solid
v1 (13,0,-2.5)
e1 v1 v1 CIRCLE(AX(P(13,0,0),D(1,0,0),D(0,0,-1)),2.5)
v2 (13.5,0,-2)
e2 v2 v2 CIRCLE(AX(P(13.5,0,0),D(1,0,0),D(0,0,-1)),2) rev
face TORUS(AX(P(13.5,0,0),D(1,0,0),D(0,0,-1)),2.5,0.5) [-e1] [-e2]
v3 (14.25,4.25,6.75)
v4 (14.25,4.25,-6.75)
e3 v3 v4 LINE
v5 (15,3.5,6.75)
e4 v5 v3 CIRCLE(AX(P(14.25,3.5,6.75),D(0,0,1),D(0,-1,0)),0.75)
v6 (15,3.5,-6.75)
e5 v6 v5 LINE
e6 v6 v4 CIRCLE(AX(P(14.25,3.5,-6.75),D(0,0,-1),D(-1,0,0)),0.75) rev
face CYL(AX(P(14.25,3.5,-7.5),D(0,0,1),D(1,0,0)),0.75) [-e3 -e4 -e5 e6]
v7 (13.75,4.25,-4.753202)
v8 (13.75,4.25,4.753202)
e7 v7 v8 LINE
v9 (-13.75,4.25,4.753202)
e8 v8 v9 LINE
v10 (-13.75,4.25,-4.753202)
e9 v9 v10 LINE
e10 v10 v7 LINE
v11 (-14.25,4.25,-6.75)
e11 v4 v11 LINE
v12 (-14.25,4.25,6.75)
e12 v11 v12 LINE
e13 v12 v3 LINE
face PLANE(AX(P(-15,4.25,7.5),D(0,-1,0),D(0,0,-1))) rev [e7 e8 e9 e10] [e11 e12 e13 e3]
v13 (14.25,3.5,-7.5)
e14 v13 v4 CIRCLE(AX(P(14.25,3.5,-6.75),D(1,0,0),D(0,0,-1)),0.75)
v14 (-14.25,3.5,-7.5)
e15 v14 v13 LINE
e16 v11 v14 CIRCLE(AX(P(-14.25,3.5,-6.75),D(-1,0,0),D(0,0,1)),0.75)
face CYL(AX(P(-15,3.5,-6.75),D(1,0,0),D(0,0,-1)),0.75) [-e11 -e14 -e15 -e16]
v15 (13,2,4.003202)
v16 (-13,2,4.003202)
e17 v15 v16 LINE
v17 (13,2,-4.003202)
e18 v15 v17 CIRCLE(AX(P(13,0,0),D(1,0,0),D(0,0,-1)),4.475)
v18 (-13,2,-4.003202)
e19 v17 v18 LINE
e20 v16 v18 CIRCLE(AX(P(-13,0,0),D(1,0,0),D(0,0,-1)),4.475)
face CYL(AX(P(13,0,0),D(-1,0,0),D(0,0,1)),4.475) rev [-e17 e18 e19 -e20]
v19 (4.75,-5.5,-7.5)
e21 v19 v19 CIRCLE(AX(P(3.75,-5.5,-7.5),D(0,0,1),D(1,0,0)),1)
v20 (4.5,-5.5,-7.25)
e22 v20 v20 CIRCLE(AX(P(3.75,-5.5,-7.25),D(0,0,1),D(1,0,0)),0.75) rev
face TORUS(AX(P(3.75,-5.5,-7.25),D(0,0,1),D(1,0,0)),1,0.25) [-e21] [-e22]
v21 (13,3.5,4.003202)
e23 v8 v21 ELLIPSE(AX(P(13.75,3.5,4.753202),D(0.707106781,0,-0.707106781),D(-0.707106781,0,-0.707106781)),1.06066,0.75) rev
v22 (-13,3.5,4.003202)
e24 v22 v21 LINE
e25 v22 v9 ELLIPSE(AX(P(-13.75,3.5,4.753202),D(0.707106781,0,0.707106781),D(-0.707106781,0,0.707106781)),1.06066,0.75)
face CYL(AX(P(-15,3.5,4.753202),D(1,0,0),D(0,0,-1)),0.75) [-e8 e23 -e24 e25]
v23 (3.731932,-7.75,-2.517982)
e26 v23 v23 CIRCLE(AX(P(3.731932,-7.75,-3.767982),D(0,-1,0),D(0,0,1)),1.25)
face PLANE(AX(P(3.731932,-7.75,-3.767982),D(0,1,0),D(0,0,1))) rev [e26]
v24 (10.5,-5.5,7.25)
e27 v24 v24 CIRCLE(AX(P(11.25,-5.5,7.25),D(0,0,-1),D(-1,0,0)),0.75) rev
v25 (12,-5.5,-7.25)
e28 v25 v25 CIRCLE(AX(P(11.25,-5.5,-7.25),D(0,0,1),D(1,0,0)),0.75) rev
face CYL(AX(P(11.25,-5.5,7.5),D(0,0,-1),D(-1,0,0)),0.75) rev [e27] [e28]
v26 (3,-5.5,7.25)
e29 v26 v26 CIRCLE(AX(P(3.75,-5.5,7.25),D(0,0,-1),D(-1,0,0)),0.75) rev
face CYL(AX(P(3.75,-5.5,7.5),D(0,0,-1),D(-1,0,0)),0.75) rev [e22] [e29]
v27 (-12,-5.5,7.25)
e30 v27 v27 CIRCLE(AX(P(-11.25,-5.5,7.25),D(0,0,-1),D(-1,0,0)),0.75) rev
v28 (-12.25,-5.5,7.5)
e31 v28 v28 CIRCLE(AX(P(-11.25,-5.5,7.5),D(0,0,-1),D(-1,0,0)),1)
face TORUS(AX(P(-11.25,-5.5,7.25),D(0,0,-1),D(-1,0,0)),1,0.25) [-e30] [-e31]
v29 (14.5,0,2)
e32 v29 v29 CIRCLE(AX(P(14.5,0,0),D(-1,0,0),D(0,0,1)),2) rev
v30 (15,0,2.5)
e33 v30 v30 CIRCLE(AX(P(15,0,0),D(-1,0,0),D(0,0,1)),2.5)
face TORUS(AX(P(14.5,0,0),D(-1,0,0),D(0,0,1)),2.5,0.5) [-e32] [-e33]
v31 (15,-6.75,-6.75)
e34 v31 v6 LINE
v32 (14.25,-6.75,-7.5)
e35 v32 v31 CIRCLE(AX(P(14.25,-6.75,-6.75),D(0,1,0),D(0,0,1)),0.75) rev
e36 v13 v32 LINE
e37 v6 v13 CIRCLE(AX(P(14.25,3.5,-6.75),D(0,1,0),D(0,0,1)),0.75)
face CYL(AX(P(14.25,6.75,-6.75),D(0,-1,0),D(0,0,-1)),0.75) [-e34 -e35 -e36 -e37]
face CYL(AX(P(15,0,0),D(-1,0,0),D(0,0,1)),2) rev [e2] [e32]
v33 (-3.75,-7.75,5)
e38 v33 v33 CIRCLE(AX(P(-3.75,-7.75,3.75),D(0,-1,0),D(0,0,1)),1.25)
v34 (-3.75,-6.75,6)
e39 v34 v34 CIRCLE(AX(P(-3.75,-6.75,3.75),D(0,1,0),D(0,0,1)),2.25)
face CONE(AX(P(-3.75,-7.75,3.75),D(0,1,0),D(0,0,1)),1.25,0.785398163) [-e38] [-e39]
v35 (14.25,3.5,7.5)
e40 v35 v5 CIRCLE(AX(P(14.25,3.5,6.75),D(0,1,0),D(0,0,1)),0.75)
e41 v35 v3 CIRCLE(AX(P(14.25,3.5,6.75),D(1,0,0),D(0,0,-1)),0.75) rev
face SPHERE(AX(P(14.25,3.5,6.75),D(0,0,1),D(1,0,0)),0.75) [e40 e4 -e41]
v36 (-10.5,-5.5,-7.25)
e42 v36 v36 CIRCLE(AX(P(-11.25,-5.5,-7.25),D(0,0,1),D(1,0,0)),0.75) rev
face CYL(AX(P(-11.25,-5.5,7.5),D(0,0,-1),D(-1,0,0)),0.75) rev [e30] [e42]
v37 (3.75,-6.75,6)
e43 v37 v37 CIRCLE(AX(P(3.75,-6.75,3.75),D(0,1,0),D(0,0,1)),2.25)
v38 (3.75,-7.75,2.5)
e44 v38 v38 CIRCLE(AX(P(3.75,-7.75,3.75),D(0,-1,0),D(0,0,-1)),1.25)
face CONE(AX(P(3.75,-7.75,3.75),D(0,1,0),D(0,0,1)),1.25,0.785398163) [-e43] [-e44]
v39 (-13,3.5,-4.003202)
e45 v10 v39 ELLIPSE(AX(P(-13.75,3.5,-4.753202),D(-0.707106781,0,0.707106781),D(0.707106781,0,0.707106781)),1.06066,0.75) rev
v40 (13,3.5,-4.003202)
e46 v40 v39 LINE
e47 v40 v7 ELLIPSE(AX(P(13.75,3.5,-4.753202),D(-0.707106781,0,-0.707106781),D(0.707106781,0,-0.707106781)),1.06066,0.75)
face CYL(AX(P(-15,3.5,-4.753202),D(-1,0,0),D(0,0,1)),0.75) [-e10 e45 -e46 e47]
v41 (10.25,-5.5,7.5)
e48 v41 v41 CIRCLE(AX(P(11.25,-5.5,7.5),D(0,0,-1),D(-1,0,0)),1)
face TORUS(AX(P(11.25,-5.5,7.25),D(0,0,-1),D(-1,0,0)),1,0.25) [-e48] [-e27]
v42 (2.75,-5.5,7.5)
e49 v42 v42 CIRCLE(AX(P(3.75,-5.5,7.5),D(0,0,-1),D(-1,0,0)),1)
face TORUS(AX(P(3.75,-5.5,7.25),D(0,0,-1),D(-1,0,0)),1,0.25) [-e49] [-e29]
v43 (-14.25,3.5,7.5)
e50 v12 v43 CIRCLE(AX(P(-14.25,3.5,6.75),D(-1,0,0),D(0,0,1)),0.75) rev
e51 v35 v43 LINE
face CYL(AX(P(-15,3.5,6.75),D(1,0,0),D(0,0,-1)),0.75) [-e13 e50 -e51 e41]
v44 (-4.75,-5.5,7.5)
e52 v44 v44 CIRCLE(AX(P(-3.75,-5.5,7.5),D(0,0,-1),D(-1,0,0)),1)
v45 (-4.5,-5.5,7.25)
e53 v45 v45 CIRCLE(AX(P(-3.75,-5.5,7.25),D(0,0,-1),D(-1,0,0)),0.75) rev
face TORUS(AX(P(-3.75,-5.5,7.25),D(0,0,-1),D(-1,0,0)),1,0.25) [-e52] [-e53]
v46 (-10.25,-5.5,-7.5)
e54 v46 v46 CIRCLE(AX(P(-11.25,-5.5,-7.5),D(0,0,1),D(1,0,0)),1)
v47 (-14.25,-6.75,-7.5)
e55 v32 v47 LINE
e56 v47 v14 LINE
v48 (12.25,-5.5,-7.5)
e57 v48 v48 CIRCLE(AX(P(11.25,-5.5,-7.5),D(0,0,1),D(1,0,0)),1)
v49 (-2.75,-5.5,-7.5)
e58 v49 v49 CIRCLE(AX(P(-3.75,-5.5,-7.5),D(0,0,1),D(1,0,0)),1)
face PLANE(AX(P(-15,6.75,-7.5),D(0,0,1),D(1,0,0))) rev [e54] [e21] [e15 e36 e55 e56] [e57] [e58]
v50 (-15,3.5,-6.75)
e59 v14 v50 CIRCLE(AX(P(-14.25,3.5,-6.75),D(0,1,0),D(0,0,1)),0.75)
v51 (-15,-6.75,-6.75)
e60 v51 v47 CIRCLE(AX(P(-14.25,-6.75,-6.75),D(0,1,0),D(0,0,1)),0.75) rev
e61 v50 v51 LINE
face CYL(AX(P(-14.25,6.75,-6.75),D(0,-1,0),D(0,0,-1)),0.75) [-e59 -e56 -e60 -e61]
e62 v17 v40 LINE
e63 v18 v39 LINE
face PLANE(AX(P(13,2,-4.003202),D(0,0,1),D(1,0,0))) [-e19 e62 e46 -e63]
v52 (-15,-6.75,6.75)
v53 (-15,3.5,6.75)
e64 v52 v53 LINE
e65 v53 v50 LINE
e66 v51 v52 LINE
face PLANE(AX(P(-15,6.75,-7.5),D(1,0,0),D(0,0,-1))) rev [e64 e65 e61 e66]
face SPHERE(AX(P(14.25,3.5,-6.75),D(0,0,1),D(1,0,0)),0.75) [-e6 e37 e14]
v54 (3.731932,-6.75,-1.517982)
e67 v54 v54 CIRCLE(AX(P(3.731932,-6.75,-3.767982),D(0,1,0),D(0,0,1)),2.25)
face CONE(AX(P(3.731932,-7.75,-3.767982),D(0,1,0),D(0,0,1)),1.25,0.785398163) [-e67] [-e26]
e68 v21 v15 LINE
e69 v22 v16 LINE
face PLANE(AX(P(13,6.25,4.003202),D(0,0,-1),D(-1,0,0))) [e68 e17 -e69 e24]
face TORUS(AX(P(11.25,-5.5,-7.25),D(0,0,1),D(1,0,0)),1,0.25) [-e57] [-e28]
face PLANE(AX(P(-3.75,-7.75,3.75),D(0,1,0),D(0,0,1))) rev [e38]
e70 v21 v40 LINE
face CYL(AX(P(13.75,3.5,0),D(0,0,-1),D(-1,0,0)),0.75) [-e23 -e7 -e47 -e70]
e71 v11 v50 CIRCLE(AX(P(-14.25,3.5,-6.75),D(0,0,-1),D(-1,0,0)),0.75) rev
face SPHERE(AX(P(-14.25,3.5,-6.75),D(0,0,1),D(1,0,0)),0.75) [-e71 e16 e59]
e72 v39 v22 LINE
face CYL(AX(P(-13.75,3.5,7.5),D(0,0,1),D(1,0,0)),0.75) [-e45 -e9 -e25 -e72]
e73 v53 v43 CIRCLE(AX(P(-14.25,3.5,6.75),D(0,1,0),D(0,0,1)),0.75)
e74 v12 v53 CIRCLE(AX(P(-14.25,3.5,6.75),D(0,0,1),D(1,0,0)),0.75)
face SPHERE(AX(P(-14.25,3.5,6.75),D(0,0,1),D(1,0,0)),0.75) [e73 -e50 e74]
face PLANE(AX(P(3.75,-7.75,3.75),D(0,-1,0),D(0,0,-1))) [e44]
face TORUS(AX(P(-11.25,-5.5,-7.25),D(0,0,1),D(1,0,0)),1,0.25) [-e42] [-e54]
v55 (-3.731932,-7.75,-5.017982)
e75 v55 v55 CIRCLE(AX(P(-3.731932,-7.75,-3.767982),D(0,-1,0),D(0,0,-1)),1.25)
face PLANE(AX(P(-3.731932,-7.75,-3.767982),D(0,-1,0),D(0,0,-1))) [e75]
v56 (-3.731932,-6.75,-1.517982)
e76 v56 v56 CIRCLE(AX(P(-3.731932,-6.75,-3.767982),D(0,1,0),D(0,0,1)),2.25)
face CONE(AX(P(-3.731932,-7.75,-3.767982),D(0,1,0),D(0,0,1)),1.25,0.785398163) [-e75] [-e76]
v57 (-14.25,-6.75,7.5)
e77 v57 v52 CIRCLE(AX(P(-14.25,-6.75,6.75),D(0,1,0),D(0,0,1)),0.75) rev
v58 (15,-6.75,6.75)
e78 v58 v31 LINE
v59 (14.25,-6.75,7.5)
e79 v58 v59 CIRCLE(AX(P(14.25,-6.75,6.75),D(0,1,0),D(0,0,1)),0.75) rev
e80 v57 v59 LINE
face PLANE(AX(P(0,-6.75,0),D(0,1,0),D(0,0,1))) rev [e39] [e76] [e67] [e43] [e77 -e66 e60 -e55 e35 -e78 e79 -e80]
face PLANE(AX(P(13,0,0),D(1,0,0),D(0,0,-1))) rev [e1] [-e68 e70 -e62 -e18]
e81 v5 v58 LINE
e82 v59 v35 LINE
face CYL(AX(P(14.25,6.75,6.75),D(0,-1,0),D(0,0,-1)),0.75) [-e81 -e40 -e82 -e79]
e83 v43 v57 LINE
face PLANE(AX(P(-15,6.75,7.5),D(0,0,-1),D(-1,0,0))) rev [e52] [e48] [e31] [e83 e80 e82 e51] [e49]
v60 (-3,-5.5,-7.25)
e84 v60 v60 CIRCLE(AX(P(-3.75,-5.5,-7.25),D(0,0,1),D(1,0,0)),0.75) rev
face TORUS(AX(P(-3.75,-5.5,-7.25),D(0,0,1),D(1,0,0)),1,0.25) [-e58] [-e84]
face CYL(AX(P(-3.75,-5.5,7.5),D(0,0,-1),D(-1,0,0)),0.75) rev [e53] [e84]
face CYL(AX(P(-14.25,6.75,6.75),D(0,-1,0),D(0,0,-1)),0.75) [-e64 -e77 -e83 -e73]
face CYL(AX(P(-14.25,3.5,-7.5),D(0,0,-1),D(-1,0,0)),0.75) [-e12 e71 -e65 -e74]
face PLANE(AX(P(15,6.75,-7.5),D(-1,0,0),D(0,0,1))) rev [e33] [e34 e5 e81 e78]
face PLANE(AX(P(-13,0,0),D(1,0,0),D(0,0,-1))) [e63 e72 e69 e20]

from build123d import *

# Parameters (mm, degrees)
SKETCH1_W               = 30
SKETCH1_H               = 15
BOSS_EXTRUDE1_DEPTH     = 6.75
CUT_EXTRUDE2_DEPTH      = 13
CUT_EXTRUDE2_DEPTH_BACK = 13
SKETCH4_R               = 2
CUT_EXTRUDE3_DEPTH      = 30.762602373
FILLET3_R               = 0.5
CUT_EXTRUDE4_DEPTH      = 32.651421769
CUT_EXTRUDE4_DEPTH_BACK = 32.651421769
SKETCH6_W               = 15
SKETCH6_H               = 2.5
FILLET6_R               = 0.75
SKETCH8_R               = 0.75
CUT_EXTRUDE5_DEPTH      = 23.261233119
FILLET9_R               = 0.75
FILLET10_R              = 0.25
SKETCH9_R               = 1.25
BOSS_EXTRUDE2_DEPTH     = 1
CHAMFER1_SIZE           = 1


with BuildPart() as part:
    # Sketch1 → Boss-Extrude1 (new, symmetric)
    with BuildSketch(Plane(origin=(0, 0, 0), x_dir=(1, 0, 0), z_dir=(0, 1, 0))):
        Rectangle(SKETCH1_W, SKETCH1_H)
    extrude(amount=BOSS_EXTRUDE1_DEPTH, both=True)

    # Sketch3 → Cut-Extrude2 (cut, two sides: drawn at the far end of the back side and taken through both)
    with BuildSketch(Plane(origin=(0, 0, 0), x_dir=(0, 0, -1), z_dir=(1, 0, 0)).offset(-CUT_EXTRUDE2_DEPTH_BACK)):
        with BuildLine():
            Line((4.003201844, 6.25), (-4.003201844, 6.25))
            Line((-4.003201844, 6.25), (-4.003201844, 2))
            ThreePointArc((-4.003201844, 2), (0, -4.475), (4.003201844, 2))
            Line((4.003201844, 2), (4.003201844, 6.25))
        make_face()
    extrude(amount=CUT_EXTRUDE2_DEPTH + CUT_EXTRUDE2_DEPTH_BACK, mode=Mode.SUBTRACT)

    # Sketch4 → Cut-Extrude3 (cut, through all)
    with BuildSketch(Plane.ZY.offset(-13)):
        Circle(SKETCH4_R)
    extrude(amount=-CUT_EXTRUDE3_DEPTH, mode=Mode.SUBTRACT)

    # Fillet3
    fillet3_edges = [part.edges().sort_by_distance(p)[0] for p in [
        (15, 0, -2),
        (13, 0, -2),
    ]]
    fillet(fillet3_edges, radius=FILLET3_R)

    # Sketch6 → Cut-Extrude4 (cut, two sides: drawn at the far end of the back side and taken through both)
    with BuildSketch(Plane(origin=(15, 0, 0), x_dir=(0, 0, -1), z_dir=(1, 0, 0)).offset(-CUT_EXTRUDE4_DEPTH_BACK)):
        with Locations((0, 5.5)):
            Rectangle(SKETCH6_W, SKETCH6_H)
    extrude(amount=CUT_EXTRUDE4_DEPTH + CUT_EXTRUDE4_DEPTH_BACK, mode=Mode.SUBTRACT)

    # Fillet6
    fillet6_edges = [part.edges().sort_by_distance(p)[0] for p in [
        (0, 4.25, 4.003201844),
        (0, 4.25, -4.003201844),
    ]]
    fillet(fillet6_edges, radius=FILLET6_R)

    # Sketch8 → Cut-Extrude5 (cut, through all)
    with BuildSketch(Plane(origin=(0, 0, -7.5), x_dir=(-1, 0, 0), z_dir=(0, 0, -1))):
        with Locations((-11.25, -5.5)):
            Circle(SKETCH8_R)
        with Locations(Location((-3.75, -5.5, 0), (0, 0, 180))):
            Circle(SKETCH8_R)
        with Locations((3.75, -5.5)):
            Circle(SKETCH8_R)
        with Locations(Location((11.25, -5.5, 0), (0, 0, 180))):
            Circle(SKETCH8_R)
    extrude(amount=-CUT_EXTRUDE5_DEPTH, mode=Mode.SUBTRACT)

    # Fillet9
    fillet9_edges = [part.edges().sort_by_distance(p)[0] for p in [
        (0, 4.25, 7.5),
        (-15, 4.25, 0),
        (-15, -1.25, 7.5),
        (-15, -1.25, -7.5),
        (15, 4.25, 0),
        (15, -1.25, 7.5),
        (0, 4.25, -7.5),
        (15, -1.25, -7.5),
        (13, 4.25, 0),
        (-13, 4.25, 0),
    ]]
    fillet(fillet9_edges, radius=FILLET9_R)

    # Fillet10
    fillet10_edges = [part.edges().sort_by_distance(p)[0] for p in [
        (-12, -5.5, 7.5),
        (-12, -5.5, -7.5),
        (12, -5.5, 7.5),
        (12, -5.5, -7.5),
        (3, -5.5, 7.5),
        (3, -5.5, -7.5),
        (-3, -5.5, 7.5),
        (-3, -5.5, -7.5),
    ]]
    fillet(fillet10_edges, radius=FILLET10_R)

    # Sketch9 → Boss-Extrude2 (add)
    with BuildSketch(Plane.XZ.offset(6.75)):
        with Locations(Location((-3.731931569, -3.767981789, 0), (0, 0, 90))):
            Circle(SKETCH9_R)
        with Locations(Location((-3.75, 3.75, 0), (0, 0, 90))):
            Circle(SKETCH9_R)
        with Locations(Location((3.731931569, -3.767981789, 0), (0, 0, 90))):
            Circle(SKETCH9_R)
        with Locations(Location((3.75, 3.75, 0), (0, 0, 90))):
            Circle(SKETCH9_R)
    extrude(amount=BOSS_EXTRUDE2_DEPTH)

    # Chamfer1
    chamfer1_edges = [part.edges().sort_by_distance(p)[0] for p in [
        (-3.731931569, -6.75, -5.017981789),
        (-3.75, -6.75, 2.5),
        (3.731931569, -6.75, -5.017981789),
        (3.75, -6.75, 2.5),
    ]]
    chamfer(chamfer1_edges, length=CHAMFER1_SIZE - 0.0001)  # a hair under: the kernel refuses the full size


solid = part.part
